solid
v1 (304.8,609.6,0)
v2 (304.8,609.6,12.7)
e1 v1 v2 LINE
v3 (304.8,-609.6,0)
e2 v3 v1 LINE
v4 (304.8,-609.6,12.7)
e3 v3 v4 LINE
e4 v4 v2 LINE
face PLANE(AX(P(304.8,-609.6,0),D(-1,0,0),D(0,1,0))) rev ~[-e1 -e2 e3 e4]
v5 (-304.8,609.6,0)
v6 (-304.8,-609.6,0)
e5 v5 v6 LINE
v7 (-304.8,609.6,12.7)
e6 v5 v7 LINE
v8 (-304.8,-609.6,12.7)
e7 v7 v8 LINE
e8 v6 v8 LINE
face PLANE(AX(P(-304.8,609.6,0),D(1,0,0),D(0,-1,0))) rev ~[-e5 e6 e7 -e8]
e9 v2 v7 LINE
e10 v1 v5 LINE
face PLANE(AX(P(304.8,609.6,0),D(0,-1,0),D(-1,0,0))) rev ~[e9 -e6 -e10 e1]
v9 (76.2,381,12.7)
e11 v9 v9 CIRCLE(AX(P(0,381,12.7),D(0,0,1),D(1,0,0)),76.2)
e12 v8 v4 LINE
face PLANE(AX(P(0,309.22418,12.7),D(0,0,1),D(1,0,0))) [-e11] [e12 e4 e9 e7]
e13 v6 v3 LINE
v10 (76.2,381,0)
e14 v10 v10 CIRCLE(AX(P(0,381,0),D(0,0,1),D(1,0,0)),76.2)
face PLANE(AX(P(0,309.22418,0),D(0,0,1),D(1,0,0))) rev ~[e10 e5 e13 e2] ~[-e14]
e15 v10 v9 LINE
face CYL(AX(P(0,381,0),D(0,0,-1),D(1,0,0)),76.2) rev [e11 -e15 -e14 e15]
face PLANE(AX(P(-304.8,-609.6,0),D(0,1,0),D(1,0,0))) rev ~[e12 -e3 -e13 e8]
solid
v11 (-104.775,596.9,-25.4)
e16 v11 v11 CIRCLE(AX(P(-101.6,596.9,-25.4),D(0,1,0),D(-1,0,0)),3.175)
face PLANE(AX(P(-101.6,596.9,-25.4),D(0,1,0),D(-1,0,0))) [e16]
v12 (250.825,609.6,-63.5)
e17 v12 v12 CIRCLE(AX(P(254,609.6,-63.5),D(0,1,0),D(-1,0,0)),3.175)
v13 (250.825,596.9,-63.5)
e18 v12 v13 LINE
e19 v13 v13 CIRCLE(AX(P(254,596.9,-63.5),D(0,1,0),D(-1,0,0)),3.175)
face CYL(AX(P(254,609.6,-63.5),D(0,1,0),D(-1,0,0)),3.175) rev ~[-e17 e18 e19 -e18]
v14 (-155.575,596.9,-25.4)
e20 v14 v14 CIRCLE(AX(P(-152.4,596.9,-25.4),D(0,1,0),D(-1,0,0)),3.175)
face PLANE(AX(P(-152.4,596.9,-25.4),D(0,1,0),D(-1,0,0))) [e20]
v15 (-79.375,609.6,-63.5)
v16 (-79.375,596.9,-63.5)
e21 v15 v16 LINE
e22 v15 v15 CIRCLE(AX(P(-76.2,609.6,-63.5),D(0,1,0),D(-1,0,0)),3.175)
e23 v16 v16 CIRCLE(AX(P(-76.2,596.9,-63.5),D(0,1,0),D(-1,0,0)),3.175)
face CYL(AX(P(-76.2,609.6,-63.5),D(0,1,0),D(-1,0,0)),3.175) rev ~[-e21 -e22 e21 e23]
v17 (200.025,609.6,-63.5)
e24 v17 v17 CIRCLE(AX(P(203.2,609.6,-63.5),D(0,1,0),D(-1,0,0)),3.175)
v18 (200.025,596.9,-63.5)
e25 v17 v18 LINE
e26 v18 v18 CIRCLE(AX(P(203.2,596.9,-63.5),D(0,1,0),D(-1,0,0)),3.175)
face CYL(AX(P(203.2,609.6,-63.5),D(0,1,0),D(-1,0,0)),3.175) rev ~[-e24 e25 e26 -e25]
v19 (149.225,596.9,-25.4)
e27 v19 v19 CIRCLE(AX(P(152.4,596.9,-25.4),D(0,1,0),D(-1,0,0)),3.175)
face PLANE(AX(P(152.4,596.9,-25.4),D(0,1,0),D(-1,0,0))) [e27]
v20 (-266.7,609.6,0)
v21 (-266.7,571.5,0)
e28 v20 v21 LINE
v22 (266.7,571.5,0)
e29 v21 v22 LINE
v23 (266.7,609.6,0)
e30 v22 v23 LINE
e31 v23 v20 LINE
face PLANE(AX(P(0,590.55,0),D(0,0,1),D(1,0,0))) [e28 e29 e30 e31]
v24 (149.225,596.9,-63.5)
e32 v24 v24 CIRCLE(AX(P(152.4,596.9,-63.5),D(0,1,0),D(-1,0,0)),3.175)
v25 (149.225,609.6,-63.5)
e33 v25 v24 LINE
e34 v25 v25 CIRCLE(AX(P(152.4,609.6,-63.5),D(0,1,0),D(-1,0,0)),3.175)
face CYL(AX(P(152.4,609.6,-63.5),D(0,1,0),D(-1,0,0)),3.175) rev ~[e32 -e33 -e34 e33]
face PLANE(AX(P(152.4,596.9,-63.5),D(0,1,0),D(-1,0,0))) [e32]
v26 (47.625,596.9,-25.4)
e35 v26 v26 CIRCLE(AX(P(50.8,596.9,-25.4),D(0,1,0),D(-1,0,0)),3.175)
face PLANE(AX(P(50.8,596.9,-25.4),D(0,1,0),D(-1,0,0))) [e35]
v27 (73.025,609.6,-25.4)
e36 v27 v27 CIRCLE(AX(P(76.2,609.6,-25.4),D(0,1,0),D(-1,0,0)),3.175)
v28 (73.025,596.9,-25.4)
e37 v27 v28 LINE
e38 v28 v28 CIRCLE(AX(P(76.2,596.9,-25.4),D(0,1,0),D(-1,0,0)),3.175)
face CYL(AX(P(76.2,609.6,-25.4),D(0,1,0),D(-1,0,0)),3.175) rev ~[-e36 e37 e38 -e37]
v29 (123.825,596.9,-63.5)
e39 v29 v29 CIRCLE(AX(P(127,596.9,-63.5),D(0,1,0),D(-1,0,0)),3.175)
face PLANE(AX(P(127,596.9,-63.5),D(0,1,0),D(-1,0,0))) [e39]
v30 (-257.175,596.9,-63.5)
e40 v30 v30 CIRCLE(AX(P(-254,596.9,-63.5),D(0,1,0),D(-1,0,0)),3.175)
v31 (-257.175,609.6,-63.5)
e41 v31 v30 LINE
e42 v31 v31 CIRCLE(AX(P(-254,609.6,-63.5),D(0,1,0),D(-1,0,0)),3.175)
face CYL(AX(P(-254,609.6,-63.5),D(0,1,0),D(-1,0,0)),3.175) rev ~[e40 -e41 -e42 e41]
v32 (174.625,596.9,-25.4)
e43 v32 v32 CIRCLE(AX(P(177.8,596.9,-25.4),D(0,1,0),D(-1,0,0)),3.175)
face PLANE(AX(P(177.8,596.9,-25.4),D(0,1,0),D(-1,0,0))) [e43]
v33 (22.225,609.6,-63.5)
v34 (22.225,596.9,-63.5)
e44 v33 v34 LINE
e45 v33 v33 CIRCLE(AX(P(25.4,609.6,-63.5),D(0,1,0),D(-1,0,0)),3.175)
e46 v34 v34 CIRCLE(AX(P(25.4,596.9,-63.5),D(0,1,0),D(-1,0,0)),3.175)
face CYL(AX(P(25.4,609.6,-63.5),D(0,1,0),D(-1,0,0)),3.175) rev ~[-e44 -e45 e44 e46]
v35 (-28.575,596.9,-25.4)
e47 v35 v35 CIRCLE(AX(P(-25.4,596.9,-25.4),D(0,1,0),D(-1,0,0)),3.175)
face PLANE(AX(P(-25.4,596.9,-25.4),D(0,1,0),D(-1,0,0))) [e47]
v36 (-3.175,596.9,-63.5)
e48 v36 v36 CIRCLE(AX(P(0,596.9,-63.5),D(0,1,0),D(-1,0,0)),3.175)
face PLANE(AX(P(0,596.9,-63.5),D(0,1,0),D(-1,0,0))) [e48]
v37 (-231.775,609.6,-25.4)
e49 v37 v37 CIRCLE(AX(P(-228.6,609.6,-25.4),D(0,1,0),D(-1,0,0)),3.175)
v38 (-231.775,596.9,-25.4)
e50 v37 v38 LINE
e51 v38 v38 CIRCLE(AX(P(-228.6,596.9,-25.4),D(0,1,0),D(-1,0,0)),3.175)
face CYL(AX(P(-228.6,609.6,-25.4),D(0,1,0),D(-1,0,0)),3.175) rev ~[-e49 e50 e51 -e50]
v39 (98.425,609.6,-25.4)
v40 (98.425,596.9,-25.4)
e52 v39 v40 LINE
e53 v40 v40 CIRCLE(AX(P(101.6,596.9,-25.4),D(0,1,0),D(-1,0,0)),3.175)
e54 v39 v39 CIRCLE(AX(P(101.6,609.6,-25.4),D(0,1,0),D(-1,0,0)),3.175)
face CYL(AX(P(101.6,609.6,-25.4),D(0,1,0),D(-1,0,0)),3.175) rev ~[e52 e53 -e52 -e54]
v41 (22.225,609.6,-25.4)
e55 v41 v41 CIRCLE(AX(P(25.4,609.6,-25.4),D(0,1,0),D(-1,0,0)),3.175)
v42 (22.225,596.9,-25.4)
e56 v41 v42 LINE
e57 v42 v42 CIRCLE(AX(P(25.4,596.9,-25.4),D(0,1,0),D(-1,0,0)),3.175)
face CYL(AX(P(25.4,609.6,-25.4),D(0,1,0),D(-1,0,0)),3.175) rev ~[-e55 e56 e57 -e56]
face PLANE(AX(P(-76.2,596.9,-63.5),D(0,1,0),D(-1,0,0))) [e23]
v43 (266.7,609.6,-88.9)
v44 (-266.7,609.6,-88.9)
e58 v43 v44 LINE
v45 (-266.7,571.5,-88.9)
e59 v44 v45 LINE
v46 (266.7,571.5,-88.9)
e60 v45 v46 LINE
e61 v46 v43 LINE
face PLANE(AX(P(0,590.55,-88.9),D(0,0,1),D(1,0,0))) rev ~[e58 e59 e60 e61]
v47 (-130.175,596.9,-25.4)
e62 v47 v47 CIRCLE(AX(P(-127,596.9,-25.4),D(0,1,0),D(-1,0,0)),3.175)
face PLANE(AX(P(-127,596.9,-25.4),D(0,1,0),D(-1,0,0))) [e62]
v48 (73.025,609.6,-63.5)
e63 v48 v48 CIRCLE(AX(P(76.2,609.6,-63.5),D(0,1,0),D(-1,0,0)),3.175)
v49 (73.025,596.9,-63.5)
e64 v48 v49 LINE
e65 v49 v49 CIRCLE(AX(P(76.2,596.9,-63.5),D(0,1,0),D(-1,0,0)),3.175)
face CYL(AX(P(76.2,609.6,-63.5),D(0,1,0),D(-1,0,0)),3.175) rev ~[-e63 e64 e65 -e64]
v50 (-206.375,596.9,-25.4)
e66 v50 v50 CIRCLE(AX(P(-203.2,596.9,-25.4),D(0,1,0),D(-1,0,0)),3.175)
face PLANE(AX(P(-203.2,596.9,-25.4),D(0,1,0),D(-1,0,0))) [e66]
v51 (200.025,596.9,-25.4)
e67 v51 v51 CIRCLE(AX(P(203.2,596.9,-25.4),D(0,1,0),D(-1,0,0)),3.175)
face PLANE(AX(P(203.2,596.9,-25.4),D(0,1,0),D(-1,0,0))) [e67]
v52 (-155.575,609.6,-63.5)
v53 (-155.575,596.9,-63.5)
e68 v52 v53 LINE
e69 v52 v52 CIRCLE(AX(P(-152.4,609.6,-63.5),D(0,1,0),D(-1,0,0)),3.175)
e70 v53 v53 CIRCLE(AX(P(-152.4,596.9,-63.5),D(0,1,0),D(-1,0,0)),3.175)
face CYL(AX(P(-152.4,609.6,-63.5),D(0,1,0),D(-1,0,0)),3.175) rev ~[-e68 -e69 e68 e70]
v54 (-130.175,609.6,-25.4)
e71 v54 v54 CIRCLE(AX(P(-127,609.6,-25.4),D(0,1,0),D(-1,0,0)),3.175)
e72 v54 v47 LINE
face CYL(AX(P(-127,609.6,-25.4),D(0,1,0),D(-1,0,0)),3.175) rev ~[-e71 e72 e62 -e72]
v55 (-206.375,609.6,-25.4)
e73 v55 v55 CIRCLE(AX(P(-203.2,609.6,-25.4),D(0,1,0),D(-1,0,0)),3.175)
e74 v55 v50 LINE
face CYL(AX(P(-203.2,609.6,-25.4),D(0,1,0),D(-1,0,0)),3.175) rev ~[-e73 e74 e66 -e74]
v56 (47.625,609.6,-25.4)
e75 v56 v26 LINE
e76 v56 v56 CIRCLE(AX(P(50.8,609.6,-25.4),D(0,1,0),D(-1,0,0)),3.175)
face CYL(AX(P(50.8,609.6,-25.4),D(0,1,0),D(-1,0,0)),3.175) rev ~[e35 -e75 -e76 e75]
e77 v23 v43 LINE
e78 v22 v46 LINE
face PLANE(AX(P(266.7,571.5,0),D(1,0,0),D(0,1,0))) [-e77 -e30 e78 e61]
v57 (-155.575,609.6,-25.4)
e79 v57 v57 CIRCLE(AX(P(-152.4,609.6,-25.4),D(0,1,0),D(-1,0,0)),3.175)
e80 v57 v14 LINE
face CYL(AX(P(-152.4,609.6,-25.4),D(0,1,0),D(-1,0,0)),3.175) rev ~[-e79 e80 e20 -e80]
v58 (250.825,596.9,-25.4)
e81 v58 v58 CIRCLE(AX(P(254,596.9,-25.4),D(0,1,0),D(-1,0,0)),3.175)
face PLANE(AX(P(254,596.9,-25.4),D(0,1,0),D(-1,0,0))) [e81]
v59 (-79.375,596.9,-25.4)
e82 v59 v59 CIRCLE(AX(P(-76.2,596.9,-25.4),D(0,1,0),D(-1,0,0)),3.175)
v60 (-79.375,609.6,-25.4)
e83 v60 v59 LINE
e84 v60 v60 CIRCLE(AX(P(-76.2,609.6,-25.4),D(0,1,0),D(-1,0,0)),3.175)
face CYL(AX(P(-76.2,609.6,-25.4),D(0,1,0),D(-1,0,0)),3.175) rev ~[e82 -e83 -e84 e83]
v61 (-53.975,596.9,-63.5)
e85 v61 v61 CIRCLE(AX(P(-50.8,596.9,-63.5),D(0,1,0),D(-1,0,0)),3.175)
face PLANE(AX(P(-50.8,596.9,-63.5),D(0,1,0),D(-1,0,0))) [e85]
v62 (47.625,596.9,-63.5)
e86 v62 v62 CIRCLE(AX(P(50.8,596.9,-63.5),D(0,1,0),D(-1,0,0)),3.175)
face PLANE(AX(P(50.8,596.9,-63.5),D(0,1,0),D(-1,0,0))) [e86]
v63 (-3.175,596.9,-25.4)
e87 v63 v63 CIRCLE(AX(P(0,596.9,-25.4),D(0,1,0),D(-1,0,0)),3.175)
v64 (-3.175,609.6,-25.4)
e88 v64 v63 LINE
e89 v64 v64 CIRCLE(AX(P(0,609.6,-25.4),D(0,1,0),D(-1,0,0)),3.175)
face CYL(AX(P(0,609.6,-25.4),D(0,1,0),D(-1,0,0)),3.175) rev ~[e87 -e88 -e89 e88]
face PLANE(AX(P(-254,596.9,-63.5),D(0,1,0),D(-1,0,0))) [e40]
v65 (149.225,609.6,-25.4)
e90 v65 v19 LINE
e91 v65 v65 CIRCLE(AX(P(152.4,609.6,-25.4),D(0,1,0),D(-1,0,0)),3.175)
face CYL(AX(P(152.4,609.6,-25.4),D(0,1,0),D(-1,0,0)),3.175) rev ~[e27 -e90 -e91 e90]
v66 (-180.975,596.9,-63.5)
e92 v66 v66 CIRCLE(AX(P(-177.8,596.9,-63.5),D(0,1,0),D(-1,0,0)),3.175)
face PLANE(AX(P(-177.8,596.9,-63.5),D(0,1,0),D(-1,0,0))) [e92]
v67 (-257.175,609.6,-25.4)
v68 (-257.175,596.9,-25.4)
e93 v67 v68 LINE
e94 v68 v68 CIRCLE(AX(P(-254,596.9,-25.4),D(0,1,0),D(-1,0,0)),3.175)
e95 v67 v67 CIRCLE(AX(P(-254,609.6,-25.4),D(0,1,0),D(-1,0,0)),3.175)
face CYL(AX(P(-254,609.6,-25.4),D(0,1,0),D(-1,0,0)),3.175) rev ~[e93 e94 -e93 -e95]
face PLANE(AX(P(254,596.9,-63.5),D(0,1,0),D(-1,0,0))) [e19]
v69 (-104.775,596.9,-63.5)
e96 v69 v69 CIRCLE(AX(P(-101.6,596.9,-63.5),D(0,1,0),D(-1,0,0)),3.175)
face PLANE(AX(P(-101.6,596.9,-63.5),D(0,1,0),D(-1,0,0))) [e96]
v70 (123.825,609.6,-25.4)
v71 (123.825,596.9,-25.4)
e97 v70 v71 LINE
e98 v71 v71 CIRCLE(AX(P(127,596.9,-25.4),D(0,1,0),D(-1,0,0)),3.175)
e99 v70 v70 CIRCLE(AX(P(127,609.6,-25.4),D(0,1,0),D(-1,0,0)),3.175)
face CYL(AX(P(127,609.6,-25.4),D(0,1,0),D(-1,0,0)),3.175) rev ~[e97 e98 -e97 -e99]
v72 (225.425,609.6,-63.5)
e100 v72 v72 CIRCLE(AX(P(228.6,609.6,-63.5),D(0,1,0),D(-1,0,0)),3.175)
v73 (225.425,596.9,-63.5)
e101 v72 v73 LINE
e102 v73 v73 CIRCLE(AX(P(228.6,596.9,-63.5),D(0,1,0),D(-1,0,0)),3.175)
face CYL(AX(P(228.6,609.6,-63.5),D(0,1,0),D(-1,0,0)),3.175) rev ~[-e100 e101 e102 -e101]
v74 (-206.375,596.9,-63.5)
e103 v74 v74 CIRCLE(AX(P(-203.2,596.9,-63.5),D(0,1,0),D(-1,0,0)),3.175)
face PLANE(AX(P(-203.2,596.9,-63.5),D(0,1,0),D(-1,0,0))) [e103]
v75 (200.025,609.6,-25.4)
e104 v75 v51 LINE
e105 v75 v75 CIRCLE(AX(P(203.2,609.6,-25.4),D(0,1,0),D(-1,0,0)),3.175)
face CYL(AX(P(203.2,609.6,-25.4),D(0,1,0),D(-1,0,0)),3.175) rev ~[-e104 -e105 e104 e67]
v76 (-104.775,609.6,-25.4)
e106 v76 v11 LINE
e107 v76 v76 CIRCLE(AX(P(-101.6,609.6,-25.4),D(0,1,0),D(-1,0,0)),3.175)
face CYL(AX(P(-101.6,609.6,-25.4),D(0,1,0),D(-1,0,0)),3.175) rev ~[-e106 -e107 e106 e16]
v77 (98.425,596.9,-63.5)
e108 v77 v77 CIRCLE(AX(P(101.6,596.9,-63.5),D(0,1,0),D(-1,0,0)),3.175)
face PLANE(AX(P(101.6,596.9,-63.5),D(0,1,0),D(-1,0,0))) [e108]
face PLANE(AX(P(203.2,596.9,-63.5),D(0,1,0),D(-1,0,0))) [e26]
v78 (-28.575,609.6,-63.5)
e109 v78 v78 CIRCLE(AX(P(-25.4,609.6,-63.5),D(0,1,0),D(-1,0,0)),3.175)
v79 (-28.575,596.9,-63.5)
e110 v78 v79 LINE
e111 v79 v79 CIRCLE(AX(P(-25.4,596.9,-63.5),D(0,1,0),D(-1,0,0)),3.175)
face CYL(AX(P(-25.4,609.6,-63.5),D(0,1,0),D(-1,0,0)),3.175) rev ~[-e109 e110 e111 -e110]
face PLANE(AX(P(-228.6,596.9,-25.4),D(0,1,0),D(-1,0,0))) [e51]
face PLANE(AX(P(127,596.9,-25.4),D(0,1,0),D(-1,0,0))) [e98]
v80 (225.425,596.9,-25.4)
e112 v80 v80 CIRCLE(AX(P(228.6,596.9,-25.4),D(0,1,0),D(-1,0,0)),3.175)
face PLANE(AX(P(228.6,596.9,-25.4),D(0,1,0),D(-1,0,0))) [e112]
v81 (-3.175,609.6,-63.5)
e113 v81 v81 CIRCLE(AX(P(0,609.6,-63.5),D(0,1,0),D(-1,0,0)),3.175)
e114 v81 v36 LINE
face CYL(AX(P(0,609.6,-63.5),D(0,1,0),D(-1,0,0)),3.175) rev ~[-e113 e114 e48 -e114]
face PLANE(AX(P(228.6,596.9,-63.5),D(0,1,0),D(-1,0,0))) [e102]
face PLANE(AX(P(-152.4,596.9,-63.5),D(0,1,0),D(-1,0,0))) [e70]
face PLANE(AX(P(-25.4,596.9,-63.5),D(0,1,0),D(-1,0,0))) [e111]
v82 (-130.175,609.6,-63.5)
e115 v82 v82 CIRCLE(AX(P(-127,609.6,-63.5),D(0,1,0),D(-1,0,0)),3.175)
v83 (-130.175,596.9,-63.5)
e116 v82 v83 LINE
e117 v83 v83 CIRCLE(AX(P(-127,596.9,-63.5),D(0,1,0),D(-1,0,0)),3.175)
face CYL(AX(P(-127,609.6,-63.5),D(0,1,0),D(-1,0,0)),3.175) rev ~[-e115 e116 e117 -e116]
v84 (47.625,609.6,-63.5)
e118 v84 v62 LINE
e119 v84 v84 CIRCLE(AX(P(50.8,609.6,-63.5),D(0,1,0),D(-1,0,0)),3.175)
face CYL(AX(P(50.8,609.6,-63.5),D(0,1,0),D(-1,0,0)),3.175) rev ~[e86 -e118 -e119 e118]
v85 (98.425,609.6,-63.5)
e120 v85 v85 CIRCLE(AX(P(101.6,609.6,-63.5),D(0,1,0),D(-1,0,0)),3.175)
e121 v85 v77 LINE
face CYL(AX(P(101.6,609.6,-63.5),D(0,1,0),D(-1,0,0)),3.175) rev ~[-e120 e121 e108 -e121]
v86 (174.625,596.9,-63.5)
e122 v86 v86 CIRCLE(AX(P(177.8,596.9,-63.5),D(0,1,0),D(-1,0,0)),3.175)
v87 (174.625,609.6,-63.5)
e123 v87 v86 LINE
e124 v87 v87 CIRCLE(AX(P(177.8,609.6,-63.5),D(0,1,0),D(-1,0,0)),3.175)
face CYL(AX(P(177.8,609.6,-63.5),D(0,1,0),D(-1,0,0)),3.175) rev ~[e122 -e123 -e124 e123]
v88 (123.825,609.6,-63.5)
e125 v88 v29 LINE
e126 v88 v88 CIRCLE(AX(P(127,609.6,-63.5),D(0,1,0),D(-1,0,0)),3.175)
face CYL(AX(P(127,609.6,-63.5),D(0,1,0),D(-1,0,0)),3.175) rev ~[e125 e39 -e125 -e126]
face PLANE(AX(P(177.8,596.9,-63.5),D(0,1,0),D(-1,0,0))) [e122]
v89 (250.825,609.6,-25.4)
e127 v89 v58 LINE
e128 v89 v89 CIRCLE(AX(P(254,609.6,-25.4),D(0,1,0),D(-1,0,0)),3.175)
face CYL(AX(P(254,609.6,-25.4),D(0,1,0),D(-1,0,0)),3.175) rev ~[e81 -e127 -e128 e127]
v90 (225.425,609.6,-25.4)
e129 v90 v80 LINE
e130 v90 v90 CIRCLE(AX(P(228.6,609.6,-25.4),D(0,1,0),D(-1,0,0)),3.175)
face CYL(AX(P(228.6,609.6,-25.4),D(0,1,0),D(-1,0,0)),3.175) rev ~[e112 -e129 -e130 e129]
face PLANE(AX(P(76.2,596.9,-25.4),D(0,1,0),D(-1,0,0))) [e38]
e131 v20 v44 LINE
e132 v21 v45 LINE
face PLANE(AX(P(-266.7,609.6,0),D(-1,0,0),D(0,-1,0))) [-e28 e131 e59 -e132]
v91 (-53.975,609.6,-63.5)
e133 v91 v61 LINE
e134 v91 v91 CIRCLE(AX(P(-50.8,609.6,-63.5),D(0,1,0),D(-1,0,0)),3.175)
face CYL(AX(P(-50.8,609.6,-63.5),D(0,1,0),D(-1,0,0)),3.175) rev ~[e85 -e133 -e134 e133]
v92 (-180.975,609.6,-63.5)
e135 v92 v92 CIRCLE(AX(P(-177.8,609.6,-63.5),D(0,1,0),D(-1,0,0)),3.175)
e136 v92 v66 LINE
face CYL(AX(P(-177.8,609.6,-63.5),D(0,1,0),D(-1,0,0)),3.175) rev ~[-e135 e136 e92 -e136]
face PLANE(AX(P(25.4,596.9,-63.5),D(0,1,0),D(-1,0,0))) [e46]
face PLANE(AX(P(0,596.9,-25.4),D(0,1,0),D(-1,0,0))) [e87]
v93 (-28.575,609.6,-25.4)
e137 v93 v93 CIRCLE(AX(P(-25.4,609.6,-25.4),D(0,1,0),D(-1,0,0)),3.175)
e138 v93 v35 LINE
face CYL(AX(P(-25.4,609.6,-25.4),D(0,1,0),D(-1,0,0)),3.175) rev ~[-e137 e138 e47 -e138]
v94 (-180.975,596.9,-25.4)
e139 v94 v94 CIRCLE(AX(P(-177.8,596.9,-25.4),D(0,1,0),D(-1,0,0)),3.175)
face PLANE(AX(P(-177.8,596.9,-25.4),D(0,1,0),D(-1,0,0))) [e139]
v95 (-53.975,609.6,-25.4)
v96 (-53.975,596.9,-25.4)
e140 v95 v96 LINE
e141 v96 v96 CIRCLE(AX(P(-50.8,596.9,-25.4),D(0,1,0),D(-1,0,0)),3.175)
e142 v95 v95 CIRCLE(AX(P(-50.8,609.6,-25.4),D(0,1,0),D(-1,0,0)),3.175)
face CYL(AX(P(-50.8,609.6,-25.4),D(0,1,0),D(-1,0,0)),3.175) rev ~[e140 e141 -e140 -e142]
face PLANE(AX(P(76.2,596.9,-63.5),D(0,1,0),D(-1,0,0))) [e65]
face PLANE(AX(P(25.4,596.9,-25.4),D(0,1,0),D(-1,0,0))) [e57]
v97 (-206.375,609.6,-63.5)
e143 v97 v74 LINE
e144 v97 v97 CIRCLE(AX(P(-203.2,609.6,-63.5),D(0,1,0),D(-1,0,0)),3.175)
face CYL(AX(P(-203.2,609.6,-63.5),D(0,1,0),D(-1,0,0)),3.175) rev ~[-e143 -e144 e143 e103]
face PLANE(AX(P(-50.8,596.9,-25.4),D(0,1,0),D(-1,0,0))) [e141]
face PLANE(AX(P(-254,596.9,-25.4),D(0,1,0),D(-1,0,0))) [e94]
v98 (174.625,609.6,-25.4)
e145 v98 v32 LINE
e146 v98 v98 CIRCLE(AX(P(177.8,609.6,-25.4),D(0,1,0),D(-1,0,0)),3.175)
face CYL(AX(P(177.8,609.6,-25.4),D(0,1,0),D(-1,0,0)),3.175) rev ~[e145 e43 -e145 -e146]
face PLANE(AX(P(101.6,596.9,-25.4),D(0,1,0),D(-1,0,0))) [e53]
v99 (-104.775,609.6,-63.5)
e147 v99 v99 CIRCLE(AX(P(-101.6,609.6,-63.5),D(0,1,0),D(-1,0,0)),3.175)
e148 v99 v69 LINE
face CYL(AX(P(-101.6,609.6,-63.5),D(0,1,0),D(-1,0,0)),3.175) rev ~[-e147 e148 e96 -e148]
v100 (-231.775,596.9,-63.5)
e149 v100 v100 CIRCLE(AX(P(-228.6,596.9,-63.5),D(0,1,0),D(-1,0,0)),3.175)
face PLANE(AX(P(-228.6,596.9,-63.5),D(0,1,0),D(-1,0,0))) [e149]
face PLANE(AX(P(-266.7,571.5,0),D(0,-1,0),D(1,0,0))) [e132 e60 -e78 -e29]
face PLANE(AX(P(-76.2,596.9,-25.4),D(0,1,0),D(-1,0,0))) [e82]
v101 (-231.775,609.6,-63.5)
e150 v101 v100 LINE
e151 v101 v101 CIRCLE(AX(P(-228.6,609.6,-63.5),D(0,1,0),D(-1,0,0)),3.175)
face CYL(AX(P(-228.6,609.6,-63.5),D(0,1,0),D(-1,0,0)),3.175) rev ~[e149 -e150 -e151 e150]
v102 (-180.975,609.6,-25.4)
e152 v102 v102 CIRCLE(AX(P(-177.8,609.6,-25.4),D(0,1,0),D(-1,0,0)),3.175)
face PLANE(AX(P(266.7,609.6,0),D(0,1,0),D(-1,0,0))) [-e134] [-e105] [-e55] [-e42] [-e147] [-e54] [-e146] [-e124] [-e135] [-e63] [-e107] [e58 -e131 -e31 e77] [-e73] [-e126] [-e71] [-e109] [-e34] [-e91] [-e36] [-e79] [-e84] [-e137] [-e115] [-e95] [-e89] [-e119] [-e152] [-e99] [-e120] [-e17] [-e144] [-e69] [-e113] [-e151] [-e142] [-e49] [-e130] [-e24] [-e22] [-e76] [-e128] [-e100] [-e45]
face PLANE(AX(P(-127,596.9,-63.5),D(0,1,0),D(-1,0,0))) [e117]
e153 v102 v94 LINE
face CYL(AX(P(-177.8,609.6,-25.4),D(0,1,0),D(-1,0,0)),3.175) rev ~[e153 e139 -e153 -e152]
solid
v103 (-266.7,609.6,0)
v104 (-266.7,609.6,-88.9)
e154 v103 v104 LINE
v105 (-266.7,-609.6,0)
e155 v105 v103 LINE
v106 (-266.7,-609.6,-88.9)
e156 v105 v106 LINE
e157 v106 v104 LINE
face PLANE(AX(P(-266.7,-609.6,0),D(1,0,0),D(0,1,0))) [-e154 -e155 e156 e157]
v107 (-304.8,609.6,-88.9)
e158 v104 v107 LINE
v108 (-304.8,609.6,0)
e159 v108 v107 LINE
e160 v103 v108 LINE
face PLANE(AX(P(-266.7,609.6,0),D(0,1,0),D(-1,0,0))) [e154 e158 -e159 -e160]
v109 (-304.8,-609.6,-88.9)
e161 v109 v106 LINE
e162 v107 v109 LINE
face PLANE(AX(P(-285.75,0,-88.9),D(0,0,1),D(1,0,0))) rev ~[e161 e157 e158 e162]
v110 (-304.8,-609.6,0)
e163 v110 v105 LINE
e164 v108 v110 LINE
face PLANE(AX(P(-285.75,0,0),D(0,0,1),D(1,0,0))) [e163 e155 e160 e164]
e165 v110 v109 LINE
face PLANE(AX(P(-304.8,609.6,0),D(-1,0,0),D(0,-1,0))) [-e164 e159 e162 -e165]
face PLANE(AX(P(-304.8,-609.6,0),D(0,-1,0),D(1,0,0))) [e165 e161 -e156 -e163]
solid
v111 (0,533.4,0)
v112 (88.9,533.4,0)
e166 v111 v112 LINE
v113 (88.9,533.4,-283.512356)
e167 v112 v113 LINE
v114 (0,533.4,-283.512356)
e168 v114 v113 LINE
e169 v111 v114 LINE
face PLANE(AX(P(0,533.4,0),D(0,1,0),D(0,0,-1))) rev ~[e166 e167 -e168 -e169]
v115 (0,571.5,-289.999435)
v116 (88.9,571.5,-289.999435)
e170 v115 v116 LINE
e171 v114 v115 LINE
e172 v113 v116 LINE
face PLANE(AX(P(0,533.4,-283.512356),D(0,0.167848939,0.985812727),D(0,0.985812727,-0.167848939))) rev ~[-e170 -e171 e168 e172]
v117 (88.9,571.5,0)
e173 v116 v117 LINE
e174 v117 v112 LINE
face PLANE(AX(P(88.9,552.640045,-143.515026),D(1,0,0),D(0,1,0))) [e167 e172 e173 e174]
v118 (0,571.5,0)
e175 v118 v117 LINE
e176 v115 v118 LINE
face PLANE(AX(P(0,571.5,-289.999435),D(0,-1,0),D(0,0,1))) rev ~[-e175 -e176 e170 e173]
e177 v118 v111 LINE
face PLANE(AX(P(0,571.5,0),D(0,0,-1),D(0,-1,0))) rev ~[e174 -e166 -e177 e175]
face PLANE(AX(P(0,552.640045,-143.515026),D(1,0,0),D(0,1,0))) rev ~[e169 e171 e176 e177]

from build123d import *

# Parameters (mm, degrees)
F2_R     = 76.2
F2_W     = 88.9
F2_H     = 38.1
F2_W_2   = 533.4
F2_H_2   = 552.45
F3_DEPTH = 12.7
F4_DEPTH = 88.9
F5_DEPTH = 88.9
F7_DEPTH = 88.9
F8_R     = 3.175
F9_DEPTH = 12.7


with BuildPart() as f3:
    # F2 (on Top) → F3 (new body)
    with BuildSketch(Plane.XY):
        Polygon((266.7, 19.05), (266.7, 571.5), (241.3, 571.5), (241.3, 533.4), (152.4, 533.4), (152.4, 571.5), (-152.4, 571.5), (-152.4, 533.4), (-241.3, 533.4), (-241.3, 571.5), (-266.7, 571.5), (-266.7, 19.05), align=None)
        with Locations((0, 381)):
            Circle(F2_R, mode=Mode.SUBTRACT)
        with Locations((-196.85, 552.45)):
            Rectangle(F2_W, F2_H)
        with Locations((196.85, 552.45)):
            Rectangle(F2_W, F2_H)
        Polygon((266.7, -609.6), (304.8, -609.6), (304.8, 609.6), (266.7, 609.6), (266.7, 571.5), (266.7, 19.05), (266.7, -19.05), (266.7, -571.5), align=None)
        Polygon((-304.8, -609.6), (-266.7, -609.6), (-266.7, -571.5), (-266.7, -19.05), (-266.7, 19.05), (-266.7, 571.5), (-266.7, 609.6), (-304.8, 609.6), align=None)
        Polygon((266.7, 571.5), (266.7, 609.6), (-266.7, 609.6), (-266.7, 571.5), (-241.3, 571.5), (-152.4, 571.5), (152.4, 571.5), (241.3, 571.5), align=None)
        with Locations((0, -590.55)):
            Rectangle(F2_W_2, F2_H)
        with Locations((0, -295.275)):
            Rectangle(F2_W_2, F2_H_2)
        Rectangle(F2_W_2, F2_H)
    extrude(amount=F3_DEPTH)


with BuildPart() as f4:
    # F2 (on Top) → F4 (new body)
    with BuildSketch(Plane.XY):
        Polygon((266.7, 571.5), (266.7, 609.6), (-266.7, 609.6), (-266.7, 571.5), (-241.3, 571.5), (-152.4, 571.5), (152.4, 571.5), (241.3, 571.5), align=None)
    extrude(amount=-F4_DEPTH)

    # F8 (on face) → F9 (cut)
    with BuildSketch(Plane(origin=(0, 609.6, 0), x_dir=(-1, 0, 0), z_dir=(0, 1, 0))):
        with Locations((-254, -63.5)):
            Circle(F8_R)
        with Locations((-254, -25.4)):
            Circle(F8_R)
        with Locations((-228.6, -63.5)):
            Circle(F8_R)
        with Locations((-228.6, -25.4)):
            Circle(F8_R)
        with Locations((-203.2, -63.5)):
            Circle(F8_R)
        with Locations((-203.2, -25.4)):
            Circle(F8_R)
        with Locations((-177.8, -63.5)):
            Circle(F8_R)
        with Locations((-177.8, -25.4)):
            Circle(F8_R)
        with Locations((-152.4, -63.5)):
            Circle(F8_R)
        with Locations((-152.4, -25.4)):
            Circle(F8_R)
        with Locations((-127, -63.5)):
            Circle(F8_R)
        with Locations((-127, -25.4)):
            Circle(F8_R)
        with Locations((-101.6, -63.5)):
            Circle(F8_R)
        with Locations((-101.6, -25.4)):
            Circle(F8_R)
        with Locations((-76.2, -63.5)):
            Circle(F8_R)
        with Locations((-76.2, -25.4)):
            Circle(F8_R)
        with Locations((-50.8, -63.5)):
            Circle(F8_R)
        with Locations((-50.8, -25.4)):
            Circle(F8_R)
        with Locations((-25.4, -63.5)):
            Circle(F8_R)
        with Locations((-25.4, -25.4)):
            Circle(F8_R)
        with Locations((0, -63.5)):
            Circle(F8_R)
        with Locations((0, -25.4)):
            Circle(F8_R)
        with Locations((25.4, -63.5)):
            Circle(F8_R)
        with Locations((25.4, -25.4)):
            Circle(F8_R)
        with Locations((50.8, -63.5)):
            Circle(F8_R)
        with Locations((50.8, -25.4)):
            Circle(F8_R)
        with Locations((76.2, -63.5)):
            Circle(F8_R)
        with Locations((76.2, -25.4)):
            Circle(F8_R)
        with Locations((101.6, -63.5)):
            Circle(F8_R)
        with Locations((101.6, -25.4)):
            Circle(F8_R)
        with Locations((127, -63.5)):
            Circle(F8_R)
        with Locations((127, -25.4)):
            Circle(F8_R)
        with Locations((152.4, -63.5)):
            Circle(F8_R)
        with Locations((152.4, -25.4)):
            Circle(F8_R)
        with Locations((177.8, -63.5)):
            Circle(F8_R)
        with Locations((177.8, -25.4)):
            Circle(F8_R)
        with Locations((203.2, -63.5)):
            Circle(F8_R)
        with Locations((203.2, -25.4)):
            Circle(F8_R)
        with Locations((228.6, -63.5)):
            Circle(F8_R)
        with Locations((228.6, -25.4)):
            Circle(F8_R)
        with Locations((254, -63.5)):
            Circle(F8_R)
        with Locations((254, -25.4)):
            Circle(F8_R)
    extrude(amount=-F9_DEPTH, mode=Mode.SUBTRACT)


with BuildPart() as f5:
    # F2 (on Top) → F5 (new body)
    with BuildSketch(Plane.XY):
        Polygon((-304.8, -609.6), (-266.7, -609.6), (-266.7, -571.5), (-266.7, -19.05), (-266.7, 19.05), (-266.7, 571.5), (-266.7, 609.6), (-304.8, 609.6), align=None)
    extrude(amount=-F5_DEPTH)


with BuildPart() as f7:
    # F6 (on Right) → F7 (new body)
    with BuildSketch(Plane.YZ):
        Polygon((571.5, -289.9994348001), (571.5, 0), (533.4, 0), (533.4, -283.5123562581), align=None)
    extrude(amount=F7_DEPTH)


solid = Compound([f3.part, f4.part, f5.part, f7.part])
